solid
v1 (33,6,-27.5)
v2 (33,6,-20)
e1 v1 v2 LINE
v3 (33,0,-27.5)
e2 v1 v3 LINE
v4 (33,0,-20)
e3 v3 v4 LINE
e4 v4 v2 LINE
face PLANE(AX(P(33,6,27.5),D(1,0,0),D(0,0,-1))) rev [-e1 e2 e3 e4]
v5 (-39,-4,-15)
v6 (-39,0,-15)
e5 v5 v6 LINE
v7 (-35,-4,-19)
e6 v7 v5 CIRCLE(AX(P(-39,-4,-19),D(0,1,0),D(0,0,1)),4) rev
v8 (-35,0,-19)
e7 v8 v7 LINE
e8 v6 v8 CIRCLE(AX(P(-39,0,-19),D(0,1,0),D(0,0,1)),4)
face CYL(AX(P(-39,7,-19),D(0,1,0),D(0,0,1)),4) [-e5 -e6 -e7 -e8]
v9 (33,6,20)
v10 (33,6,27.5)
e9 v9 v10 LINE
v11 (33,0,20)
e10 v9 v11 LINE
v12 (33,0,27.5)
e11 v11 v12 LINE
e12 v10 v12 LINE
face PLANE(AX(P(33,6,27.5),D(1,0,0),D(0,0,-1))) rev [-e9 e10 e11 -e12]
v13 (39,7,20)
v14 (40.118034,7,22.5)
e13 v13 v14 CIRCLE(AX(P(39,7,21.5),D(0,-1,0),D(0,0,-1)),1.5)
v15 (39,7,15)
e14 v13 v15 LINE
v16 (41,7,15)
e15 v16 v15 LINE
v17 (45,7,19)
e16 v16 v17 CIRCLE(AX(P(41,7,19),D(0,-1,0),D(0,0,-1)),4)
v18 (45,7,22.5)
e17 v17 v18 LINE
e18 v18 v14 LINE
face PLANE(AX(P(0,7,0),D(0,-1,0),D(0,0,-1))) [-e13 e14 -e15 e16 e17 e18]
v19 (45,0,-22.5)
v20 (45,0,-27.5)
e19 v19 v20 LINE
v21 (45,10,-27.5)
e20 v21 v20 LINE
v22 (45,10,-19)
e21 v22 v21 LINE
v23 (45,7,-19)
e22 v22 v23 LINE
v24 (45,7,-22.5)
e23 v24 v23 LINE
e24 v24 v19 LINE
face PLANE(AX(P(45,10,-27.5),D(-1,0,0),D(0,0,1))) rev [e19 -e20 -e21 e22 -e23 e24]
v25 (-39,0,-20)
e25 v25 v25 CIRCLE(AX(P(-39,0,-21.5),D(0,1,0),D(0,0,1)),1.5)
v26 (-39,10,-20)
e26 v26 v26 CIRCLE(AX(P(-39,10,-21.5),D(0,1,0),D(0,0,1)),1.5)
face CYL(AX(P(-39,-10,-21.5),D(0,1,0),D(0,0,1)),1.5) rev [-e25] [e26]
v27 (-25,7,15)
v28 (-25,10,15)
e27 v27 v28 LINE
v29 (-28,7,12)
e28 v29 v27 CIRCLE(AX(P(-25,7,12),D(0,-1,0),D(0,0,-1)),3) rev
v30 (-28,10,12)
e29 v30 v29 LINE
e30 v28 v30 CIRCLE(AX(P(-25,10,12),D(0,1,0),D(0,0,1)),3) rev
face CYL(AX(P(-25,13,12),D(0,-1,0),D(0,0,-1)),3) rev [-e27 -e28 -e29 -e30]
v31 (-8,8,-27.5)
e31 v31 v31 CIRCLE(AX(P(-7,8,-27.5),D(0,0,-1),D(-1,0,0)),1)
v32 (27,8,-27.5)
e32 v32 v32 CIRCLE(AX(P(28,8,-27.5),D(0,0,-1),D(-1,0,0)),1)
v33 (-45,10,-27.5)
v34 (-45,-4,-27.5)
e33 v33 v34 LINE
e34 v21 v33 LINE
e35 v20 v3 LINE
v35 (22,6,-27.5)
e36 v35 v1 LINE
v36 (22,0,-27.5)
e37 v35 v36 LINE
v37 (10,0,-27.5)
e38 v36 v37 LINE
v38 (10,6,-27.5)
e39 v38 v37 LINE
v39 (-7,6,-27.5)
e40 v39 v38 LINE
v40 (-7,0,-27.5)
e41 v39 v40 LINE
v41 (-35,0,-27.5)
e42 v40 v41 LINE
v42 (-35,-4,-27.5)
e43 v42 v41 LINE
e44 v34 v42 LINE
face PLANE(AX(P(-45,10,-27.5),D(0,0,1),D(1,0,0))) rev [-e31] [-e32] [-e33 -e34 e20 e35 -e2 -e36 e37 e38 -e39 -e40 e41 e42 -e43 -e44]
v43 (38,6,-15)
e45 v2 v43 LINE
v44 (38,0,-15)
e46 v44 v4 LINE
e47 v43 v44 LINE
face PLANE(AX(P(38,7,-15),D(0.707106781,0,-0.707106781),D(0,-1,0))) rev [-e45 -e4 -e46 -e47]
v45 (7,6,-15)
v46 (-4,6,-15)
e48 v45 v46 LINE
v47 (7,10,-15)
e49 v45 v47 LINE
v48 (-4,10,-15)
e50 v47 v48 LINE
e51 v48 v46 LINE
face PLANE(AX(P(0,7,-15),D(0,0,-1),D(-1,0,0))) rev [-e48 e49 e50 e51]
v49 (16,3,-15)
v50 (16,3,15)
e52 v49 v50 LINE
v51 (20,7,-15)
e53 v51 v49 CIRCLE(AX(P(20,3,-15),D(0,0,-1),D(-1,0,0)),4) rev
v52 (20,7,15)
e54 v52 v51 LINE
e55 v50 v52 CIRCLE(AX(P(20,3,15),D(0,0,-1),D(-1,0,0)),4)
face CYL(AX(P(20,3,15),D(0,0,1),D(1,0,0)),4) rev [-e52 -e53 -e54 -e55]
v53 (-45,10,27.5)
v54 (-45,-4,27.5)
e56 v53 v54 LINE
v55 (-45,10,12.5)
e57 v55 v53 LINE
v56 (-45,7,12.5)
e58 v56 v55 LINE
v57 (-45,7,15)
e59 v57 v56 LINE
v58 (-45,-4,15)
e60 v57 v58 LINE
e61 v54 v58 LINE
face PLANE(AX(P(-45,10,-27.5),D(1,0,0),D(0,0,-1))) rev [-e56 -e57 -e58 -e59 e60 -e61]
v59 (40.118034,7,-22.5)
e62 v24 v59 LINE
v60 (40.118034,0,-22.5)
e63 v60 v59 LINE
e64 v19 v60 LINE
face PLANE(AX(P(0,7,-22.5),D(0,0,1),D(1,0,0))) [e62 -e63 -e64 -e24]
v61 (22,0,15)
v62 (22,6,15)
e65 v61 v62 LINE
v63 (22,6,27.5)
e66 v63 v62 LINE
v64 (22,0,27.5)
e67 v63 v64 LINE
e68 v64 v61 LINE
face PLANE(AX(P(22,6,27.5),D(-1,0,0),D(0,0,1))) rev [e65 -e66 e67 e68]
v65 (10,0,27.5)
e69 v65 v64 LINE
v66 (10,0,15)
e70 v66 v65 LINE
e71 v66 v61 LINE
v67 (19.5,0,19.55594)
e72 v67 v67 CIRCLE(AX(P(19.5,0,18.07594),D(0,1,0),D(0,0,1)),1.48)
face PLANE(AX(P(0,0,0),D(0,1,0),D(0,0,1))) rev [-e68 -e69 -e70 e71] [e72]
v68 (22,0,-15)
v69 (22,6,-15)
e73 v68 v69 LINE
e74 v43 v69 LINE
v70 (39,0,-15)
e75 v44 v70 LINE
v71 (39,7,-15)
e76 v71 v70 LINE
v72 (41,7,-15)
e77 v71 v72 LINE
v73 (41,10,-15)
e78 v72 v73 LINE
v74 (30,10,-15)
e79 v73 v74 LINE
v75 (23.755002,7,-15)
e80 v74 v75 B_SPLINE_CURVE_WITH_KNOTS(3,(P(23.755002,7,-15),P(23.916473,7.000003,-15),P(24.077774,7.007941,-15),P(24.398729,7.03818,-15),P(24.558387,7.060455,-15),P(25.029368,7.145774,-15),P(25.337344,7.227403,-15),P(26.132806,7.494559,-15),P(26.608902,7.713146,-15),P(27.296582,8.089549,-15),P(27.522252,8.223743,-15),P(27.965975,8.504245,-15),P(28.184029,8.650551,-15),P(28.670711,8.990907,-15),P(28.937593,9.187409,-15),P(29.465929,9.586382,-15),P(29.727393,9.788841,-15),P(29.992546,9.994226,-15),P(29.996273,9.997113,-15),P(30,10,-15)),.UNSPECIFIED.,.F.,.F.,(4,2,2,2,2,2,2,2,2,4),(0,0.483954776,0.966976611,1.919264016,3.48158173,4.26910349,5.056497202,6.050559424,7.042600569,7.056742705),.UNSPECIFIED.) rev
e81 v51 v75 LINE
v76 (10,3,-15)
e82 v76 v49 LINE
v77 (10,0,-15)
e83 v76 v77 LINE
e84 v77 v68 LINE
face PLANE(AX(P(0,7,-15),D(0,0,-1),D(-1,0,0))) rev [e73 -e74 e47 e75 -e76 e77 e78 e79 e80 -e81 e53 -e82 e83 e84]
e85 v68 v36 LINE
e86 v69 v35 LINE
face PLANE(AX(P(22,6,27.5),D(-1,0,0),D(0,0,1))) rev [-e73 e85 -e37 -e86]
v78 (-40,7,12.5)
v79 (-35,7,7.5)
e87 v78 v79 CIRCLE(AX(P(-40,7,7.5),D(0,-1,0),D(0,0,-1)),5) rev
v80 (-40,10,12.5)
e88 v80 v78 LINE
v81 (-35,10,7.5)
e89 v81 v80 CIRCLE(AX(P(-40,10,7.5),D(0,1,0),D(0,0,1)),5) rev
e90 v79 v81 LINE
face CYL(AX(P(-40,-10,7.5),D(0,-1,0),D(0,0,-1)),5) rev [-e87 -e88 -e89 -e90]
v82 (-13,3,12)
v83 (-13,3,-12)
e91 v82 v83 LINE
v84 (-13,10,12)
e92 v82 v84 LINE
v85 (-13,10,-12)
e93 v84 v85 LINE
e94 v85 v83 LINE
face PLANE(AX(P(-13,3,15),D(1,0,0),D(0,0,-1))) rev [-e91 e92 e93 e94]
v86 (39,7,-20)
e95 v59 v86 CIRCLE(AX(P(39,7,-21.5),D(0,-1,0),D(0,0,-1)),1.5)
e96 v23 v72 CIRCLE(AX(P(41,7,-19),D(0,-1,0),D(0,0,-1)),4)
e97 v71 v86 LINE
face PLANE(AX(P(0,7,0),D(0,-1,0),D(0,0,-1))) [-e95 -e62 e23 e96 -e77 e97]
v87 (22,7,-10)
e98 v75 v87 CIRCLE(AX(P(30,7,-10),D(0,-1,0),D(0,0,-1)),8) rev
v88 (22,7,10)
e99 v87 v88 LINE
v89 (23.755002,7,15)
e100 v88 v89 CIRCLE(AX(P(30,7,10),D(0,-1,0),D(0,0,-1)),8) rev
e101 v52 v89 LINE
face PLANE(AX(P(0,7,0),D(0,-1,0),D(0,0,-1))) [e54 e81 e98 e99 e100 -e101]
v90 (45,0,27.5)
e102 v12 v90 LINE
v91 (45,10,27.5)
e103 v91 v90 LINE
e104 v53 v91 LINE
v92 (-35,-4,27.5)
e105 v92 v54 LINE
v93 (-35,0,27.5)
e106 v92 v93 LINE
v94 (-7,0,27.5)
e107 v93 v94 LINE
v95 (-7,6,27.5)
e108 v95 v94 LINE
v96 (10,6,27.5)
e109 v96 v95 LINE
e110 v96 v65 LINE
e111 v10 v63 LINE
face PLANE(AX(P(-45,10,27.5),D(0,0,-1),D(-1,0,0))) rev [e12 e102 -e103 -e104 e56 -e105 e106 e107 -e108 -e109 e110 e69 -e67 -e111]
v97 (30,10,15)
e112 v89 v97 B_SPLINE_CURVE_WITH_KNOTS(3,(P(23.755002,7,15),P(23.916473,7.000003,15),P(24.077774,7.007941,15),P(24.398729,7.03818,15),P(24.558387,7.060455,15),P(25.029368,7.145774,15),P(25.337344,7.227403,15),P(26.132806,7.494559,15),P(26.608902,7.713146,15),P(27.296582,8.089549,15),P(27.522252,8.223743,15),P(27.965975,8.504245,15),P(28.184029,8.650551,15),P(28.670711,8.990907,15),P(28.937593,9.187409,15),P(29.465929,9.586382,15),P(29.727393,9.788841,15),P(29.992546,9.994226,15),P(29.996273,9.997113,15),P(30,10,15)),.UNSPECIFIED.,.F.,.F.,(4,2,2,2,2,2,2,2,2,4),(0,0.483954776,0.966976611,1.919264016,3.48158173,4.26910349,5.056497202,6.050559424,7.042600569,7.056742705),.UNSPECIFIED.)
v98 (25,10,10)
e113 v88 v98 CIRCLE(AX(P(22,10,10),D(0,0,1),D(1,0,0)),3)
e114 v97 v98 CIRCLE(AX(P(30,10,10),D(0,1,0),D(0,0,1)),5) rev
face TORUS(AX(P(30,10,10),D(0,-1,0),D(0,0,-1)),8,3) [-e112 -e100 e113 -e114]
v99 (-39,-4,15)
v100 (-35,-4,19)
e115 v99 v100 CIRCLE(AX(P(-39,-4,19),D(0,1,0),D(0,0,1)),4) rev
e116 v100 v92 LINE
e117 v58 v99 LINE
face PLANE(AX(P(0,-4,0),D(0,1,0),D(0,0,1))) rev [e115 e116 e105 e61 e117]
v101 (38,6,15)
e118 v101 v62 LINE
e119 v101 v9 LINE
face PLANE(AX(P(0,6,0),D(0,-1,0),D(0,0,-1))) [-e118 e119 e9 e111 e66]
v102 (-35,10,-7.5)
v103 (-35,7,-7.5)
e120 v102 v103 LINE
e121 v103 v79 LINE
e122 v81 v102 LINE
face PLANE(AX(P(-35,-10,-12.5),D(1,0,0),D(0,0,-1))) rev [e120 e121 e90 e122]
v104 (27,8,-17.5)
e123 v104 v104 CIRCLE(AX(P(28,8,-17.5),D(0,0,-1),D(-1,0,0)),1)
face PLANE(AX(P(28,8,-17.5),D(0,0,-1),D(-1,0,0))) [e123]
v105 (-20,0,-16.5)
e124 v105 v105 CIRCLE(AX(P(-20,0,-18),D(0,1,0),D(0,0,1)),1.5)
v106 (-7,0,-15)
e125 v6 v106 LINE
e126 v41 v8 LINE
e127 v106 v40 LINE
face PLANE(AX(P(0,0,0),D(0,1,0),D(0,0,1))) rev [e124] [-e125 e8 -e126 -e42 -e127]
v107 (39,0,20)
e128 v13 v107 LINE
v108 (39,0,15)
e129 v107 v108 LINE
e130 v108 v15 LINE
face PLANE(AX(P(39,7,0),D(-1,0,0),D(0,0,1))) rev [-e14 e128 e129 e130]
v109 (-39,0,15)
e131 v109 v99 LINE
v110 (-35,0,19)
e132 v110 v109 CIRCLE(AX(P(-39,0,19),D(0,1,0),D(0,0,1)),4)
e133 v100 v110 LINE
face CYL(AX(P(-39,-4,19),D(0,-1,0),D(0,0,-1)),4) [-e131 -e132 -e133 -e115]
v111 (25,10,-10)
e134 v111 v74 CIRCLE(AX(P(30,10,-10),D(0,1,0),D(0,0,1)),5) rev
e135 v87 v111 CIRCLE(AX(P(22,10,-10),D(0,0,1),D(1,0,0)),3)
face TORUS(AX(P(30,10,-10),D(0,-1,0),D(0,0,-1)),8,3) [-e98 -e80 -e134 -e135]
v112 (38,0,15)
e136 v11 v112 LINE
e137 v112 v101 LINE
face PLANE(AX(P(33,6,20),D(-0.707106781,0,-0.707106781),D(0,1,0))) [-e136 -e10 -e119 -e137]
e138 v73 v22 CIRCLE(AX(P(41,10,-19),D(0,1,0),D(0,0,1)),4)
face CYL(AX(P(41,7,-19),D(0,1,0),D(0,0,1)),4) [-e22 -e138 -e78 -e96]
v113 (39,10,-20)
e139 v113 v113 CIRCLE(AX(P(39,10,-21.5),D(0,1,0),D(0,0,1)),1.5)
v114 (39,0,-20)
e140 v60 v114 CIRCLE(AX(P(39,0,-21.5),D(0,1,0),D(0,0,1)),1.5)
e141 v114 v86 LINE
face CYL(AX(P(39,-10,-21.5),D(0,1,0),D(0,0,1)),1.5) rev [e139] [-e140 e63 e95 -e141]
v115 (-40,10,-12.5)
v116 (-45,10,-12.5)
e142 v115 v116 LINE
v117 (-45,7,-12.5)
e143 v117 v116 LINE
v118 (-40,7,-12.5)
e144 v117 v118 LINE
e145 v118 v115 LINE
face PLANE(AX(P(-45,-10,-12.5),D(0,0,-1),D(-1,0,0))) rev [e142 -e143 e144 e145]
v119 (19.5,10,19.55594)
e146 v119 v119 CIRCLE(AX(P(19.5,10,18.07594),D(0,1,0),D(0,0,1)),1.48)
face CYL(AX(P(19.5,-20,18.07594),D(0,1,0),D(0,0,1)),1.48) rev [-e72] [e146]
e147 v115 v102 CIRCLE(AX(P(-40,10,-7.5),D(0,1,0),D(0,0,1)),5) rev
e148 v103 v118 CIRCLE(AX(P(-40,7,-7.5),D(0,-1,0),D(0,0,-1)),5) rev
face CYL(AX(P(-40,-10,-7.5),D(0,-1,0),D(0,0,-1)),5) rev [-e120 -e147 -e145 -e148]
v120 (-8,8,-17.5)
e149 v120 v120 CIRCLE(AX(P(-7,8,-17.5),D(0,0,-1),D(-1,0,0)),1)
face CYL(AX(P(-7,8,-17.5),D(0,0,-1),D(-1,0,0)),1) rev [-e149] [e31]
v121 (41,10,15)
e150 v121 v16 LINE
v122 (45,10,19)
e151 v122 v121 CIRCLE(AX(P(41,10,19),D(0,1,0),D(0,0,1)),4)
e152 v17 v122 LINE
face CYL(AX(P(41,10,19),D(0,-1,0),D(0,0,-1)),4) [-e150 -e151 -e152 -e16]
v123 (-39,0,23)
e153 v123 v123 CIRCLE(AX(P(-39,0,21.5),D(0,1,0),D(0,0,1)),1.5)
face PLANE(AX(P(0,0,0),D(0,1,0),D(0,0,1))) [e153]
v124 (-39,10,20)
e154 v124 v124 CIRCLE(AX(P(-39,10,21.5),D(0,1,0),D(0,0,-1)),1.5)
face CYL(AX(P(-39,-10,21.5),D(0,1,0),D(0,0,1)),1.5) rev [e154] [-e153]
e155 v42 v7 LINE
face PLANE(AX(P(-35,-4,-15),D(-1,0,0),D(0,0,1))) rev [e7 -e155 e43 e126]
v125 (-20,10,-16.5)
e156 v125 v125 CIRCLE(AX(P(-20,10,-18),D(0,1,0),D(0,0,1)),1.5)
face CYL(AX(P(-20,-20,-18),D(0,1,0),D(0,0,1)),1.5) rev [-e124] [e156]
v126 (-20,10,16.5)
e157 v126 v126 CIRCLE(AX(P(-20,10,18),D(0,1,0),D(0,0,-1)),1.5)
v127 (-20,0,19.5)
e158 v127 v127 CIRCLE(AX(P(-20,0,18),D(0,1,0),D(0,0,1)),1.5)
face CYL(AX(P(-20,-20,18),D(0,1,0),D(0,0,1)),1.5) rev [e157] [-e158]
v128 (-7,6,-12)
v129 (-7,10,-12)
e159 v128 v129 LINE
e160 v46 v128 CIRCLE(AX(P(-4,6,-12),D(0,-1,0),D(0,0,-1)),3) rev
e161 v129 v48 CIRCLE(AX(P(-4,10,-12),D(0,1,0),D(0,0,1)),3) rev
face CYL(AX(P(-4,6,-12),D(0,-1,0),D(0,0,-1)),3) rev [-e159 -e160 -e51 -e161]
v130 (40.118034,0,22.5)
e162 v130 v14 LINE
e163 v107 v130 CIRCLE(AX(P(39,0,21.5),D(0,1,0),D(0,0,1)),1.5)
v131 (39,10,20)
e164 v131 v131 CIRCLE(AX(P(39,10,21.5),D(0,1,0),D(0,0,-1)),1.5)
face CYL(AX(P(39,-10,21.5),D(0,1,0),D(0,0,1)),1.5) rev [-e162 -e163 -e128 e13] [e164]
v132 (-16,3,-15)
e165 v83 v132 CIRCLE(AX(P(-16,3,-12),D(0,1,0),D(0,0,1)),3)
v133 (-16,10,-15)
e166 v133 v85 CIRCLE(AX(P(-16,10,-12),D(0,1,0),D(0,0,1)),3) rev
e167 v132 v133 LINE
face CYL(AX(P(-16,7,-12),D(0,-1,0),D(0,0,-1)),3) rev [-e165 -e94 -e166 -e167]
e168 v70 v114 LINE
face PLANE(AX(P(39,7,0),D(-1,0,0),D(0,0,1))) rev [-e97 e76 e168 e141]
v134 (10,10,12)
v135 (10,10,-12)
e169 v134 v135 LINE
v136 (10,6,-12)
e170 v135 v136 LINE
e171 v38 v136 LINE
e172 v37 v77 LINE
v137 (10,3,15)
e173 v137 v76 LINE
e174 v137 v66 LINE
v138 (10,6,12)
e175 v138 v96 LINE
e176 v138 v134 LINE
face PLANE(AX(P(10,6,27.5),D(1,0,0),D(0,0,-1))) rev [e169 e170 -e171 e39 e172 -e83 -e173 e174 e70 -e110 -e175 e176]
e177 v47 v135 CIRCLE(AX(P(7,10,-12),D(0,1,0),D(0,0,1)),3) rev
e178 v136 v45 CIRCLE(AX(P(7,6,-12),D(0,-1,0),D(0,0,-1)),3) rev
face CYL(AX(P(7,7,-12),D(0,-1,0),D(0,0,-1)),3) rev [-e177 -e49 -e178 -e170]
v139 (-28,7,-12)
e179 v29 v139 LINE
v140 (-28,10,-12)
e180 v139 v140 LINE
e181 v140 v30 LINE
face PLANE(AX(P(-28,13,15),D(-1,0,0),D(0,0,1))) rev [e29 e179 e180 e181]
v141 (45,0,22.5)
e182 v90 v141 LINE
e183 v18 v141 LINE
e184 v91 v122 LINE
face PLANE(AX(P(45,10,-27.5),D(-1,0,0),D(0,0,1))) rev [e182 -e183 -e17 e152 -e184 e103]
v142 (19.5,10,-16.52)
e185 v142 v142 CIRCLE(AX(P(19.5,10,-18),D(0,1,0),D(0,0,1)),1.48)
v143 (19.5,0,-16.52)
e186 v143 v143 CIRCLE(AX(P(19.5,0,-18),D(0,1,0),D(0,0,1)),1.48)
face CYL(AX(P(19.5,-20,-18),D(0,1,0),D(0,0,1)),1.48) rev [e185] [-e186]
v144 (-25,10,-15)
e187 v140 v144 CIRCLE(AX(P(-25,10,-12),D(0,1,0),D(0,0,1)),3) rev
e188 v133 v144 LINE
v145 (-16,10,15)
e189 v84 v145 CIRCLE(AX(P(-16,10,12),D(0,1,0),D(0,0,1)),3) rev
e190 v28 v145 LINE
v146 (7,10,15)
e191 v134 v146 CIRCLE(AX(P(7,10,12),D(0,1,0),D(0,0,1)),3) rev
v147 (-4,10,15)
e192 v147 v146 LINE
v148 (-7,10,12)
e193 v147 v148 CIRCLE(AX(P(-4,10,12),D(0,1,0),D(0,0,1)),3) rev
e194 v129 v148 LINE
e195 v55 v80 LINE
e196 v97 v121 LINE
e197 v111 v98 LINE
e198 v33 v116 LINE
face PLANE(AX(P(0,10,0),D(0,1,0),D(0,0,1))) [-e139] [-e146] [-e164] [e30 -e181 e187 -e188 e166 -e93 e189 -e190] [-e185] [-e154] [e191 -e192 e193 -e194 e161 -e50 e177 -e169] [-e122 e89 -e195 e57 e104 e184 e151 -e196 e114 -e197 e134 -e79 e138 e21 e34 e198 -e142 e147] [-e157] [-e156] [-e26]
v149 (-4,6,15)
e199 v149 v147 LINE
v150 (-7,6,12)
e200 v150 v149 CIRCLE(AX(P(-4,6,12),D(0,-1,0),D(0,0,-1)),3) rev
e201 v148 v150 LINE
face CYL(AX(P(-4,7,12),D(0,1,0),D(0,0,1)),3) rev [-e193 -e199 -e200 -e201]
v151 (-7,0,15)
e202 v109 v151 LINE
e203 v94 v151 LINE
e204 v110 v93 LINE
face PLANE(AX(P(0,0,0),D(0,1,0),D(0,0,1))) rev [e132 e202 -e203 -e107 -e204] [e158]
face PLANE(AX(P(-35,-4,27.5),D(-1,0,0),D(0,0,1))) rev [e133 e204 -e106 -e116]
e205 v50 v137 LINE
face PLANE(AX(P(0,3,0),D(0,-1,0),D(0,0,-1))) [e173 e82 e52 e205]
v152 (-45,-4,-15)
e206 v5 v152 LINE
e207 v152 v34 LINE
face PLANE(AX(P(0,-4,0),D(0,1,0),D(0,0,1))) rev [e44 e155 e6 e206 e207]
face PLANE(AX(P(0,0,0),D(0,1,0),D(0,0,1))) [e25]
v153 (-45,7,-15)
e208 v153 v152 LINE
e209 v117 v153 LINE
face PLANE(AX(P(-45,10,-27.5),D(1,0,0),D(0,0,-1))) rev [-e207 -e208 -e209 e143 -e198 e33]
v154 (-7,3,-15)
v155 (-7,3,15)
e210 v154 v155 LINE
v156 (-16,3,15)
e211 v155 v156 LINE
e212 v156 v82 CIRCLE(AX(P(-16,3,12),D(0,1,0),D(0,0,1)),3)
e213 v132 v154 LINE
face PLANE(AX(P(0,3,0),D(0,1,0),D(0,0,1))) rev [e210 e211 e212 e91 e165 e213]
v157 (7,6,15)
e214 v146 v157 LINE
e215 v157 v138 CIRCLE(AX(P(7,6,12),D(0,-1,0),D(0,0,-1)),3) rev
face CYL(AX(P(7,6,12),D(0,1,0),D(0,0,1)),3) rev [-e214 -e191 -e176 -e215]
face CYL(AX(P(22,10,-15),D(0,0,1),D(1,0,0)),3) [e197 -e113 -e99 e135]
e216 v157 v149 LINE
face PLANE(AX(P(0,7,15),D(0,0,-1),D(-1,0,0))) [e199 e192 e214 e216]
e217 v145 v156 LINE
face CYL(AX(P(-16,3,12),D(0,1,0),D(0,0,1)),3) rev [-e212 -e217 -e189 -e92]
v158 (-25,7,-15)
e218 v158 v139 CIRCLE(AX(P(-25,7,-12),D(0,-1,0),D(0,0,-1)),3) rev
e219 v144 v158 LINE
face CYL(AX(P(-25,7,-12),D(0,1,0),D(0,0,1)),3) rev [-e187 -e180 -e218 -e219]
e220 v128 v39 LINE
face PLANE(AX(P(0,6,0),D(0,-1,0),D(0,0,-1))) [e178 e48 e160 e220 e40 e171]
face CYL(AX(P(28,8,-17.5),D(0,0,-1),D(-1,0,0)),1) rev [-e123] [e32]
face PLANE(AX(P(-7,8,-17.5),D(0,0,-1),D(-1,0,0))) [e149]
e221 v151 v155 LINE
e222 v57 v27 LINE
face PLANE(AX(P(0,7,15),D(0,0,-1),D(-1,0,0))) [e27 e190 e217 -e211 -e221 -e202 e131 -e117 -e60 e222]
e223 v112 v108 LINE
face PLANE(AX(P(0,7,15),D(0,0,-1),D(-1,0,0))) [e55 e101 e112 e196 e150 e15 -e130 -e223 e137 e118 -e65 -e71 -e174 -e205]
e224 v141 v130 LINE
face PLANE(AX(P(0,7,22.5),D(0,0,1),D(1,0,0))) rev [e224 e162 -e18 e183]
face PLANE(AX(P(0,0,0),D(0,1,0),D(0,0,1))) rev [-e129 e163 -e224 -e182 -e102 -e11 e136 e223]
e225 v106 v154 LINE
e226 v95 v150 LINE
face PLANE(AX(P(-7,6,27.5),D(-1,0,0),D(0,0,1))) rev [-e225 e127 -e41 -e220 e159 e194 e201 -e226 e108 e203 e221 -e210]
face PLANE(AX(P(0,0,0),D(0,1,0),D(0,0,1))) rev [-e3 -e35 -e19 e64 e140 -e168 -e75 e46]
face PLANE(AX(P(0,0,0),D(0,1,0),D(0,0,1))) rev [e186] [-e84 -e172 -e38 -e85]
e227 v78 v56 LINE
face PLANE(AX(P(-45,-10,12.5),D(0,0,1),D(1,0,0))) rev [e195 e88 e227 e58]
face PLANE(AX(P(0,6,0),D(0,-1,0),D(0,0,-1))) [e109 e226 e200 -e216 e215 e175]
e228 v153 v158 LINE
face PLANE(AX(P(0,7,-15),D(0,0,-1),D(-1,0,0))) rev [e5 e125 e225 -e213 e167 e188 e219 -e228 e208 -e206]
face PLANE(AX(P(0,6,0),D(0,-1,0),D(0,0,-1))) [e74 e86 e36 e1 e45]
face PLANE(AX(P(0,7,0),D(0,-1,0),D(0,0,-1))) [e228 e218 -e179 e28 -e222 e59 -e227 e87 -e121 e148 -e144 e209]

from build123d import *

# Parameters (mm, degrees)
SKETCH_1_W           = 90
SKETCH_1_H           = 55
EXTRUDE_1_DEPTH      = 10
SKETCH_2_R           = 1.5
SKETCH_2_R_2         = 1.48
CUT_EXTRUDE_1_DEPTH  = 30
SKETCH_3_W           = 80
SKETCH_3_H           = 30
SKETCH_3_W_2         = 6
SKETCH_3_H_2         = 45
CUT_EXTRUDE_2_DEPTH  = 7
SKETCH_4_R           = 1.5
CUT_EXTRUDE_3_DEPTH  = 20
SKETCH_8_W           = 10
SKETCH_8_H           = 25
SKETCH_8_W_2         = 20
SKETCH_8_H_2         = 30
CUT_EXTRUDE_6_DEPTH  = 20
SKETCH_10_W          = 11
SKETCH_10_H          = 55
SKETCH_10_W_2        = 17
CUT_EXTRUDE_8_DEPTH  = 6
FILLET_3_R           = 5
SKETCH_11_W          = 6
SKETCH_11_H          = 30
EXTRUDE_3_DEPTH      = 4
CHAMFER_3_SIZE       = 5
FILLET_7_R           = 3
SKETCH_12_W          = 15
SKETCH_12_H          = 30
SKETCH_12_W_2        = 17
CUT_EXTRUDE_9_DEPTH  = 6
FILLET_8_R           = 3
FILLET_9_R           = 4
SKETCH_13_W          = 10
SKETCH_13_H          = 12.5
EXTRUDE_4_DEPTH      = 4
FILLET_10_R          = 4
FILLET_11_R          = 4
SKETCH_14_R          = 1
CUT_EXTRUDE_10_DEPTH = 10


# Some blends are built 0.0001 mm under size
with BuildPart() as part:
    # 草图1 → 凸台-拉伸1 (new body)
    with BuildSketch(Plane(origin=(0, 0, 0), x_dir=(1, 0, 0), z_dir=(0, 1, 0))):
        Rectangle(SKETCH_1_W, SKETCH_1_H)
    extrude(amount=EXTRUDE_1_DEPTH)

    # 草图2 → 切除-拉伸1 (cut)
    with BuildSketch(Plane(origin=(0, 10, 0), x_dir=(1, 0, 0), z_dir=(0, 1, 0))):
        with Locations(Location((-20, 18, 0), (0, 0, 270))):
            Circle(SKETCH_2_R)
        with Locations(Location((-20, -18, 0), (0, 0, 270))):
            Circle(SKETCH_2_R)
        with Locations(Location((19.5, -18.075939793, 0), (0, 0, 270))):
            Circle(SKETCH_2_R_2)
        with Locations(Location((19.5, 18, 0), (0, 0, 270))):
            Circle(SKETCH_2_R_2)
    extrude(amount=-CUT_EXTRUDE_1_DEPTH, mode=Mode.SUBTRACT)

    # 草图3 → 切除-拉伸2 (cut)
    with BuildSketch(Plane.XZ):
        with Locations((-5, 0)):
            Rectangle(SKETCH_3_W, SKETCH_3_H)
        with Locations((42, 0)):
            Rectangle(SKETCH_3_W_2, SKETCH_3_H_2)
    extrude(amount=-CUT_EXTRUDE_2_DEPTH, mode=Mode.SUBTRACT)

    # 草图4 → 切除-拉伸3 (cut)
    with BuildSketch(Plane(origin=(0, 10, 0), x_dir=(1, 0, 0), z_dir=(0, 1, 0))):
        with Locations(Location((39, 21.5, 0), (0, 0, 270))):
            Circle(SKETCH_4_R)
        with Locations(Location((-39, 21.5, 0), (0, 0, 270))):
            Circle(SKETCH_4_R)
        with Locations(Location((-39, -21.5, 0), (0, 0, 270))):
            Circle(SKETCH_4_R)
        with Locations(Location((39, -21.5, 0), (0, 0, 90))):
            Circle(SKETCH_4_R)
    extrude(amount=-CUT_EXTRUDE_3_DEPTH, mode=Mode.SUBTRACT)

    # 草图8 → 切除-拉伸6 (cut)
    with BuildSketch(Plane(origin=(0, 10, 0), x_dir=(1, 0, 0), z_dir=(0, 1, 0))):
        with Locations((-40, 0)):
            Rectangle(SKETCH_8_W, SKETCH_8_H)
        with Locations((35, 0)):
            Rectangle(SKETCH_8_W_2, SKETCH_8_H_2)
    extrude(amount=-CUT_EXTRUDE_6_DEPTH, mode=Mode.SUBTRACT)

    # 草图10 → 切除-拉伸8 (cut)
    with BuildSketch(Plane.XZ):
        with Locations((27.5, 0)):
            Rectangle(SKETCH_10_W, SKETCH_10_H)
        with Locations((1.5, 0)):
            Rectangle(SKETCH_10_W_2, SKETCH_10_H)
    extrude(amount=-CUT_EXTRUDE_8_DEPTH, mode=Mode.SUBTRACT)

    # 圆角3
    fillet_3_edges = [part.edges().sort_by_distance(p)[0] for p in [
        (-35, 8.5, -12.5),
        (-35, 8.5, 12.5),
        (25, 8.5, 15),
        (25, 8.5, -15),
    ]]
    fillet(fillet_3_edges, radius=FILLET_3_R)

    # 草图11 → 凸台-拉伸3 (add)
    with BuildSketch(Plane.XZ.offset(-7)):
        with Locations((-10, 0)):
            Rectangle(SKETCH_11_W, SKETCH_11_H)
        with Locations((13, 0)):
            Rectangle(SKETCH_11_W, SKETCH_11_H)
    extrude(amount=EXTRUDE_3_DEPTH)

    # 倒角3
    chamfer_3_edges = [part.edges().sort_by_distance(p)[0] for p in [
        (33, 3, 15),
        (33, 3, -15),
    ]]
    chamfer(chamfer_3_edges, length=CHAMFER_3_SIZE)

    # 圆角7
    # the kernel refuses this fillet: 3 mm, written as the material it takes off along each edge
    with BuildSketch(Plane(origin=(25, 7, 10), x_dir=(0, 1, 0), z_dir=(0, 0, -1))) as fillet_7_piece_1:
        with BuildLine():
            CenterArc((FILLET_7_R, -FILLET_7_R), FILLET_7_R, 90, 90)
            Line((0, -FILLET_7_R), (0, 0))
            Line((0, 0), (FILLET_7_R, 0))
        make_face()
    extrude(amount=20, mode=Mode.SUBTRACT)
    with BuildSketch(Plane(origin=(30, 7, 10), x_dir=(0.9975374290817743, 0, 0.0701361360564157), z_dir=(0.0701361360564157, 0, -0.9975374290817743))) as fillet_7_piece_2_section:
        with BuildLine():
            CenterArc((5 + FILLET_7_R, -FILLET_7_R), FILLET_7_R, 90, 90)
            Line((5 + FILLET_7_R, 0), (5, 0))
            Line((5, 0), (5, -FILLET_7_R))
        make_face()
    fillet_7_piece_2 = revolve(axis=Axis((30, 7, 10), (0, -1, 0)), revolution_arc=175.978193542, mode=Mode.PRIVATE)
    fillet_7_piece_2 = split(fillet_7_piece_2, bisect_by=Plane(origin=(26.314129742, 7.843114036, 15), z_dir=(0, 0, -1)), keep=Keep.TOP, mode=Mode.PRIVATE)
    add(fillet_7_piece_2, mode=Mode.SUBTRACT)
    with BuildSketch(Plane(origin=(30, 7, -10), x_dir=(0.9975374290817743, 0, -0.0701361360564157), z_dir=(0.0701361360564157, 0, 0.9975374290817743))) as fillet_7_piece_3_section:
        with BuildLine():
            CenterArc((5 + FILLET_7_R, FILLET_7_R), FILLET_7_R, 180, 90)
            Line((5 + FILLET_7_R, 0), (5, 0))
            Line((5, 0), (5, FILLET_7_R))
        make_face()
    fillet_7_piece_3 = revolve(axis=Axis((30, 7, -10), (0, 1, 0)), revolution_arc=175.978193542, mode=Mode.PRIVATE)
    fillet_7_piece_3 = split(fillet_7_piece_3, bisect_by=Plane(origin=(26.31413004, 7.843114018, -15), z_dir=(0, 0, 1)), keep=Keep.TOP, mode=Mode.PRIVATE)
    add(fillet_7_piece_3, mode=Mode.SUBTRACT)

    # 草图12 → 切除-拉伸9 (cut)
    with BuildSketch(Plane.XZ.offset(-7)):
        with Locations((-20.5, 0)):
            Rectangle(SKETCH_12_W, SKETCH_12_H)
        with Locations((1.5, 0)):
            Rectangle(SKETCH_12_W_2, SKETCH_12_H)
    extrude(amount=-CUT_EXTRUDE_9_DEPTH, mode=Mode.SUBTRACT)

    # 圆角8
    fillet_8_edges = [part.edges().sort_by_distance(p)[0] for p in [
        (-7, 8, -15),
        (-7, 8, 15),
        (-13, 6.5, 15),
        (-13, 6.5, -15),
        (10, 8, 15),
        (10, 8, -15),
        (-28, 8.5, -15),
        (-28, 8.5, 15),
    ]]
    fillet(fillet_8_edges, radius=FILLET_8_R)

    # 圆角9
    fillet_9_edges = [part.edges().sort_by_distance(p)[0] for p in [
        (16, 7, 0),
    ]]
    fillet(fillet_9_edges, radius=FILLET_9_R - 0.0001)  # a hair under: the kernel refuses the full size

    # 草图13 → 凸台-拉伸4 (add)
    with BuildSketch(Plane.XZ):
        with Locations((-40, 21.25)):
            Rectangle(SKETCH_13_W, SKETCH_13_H)
        with Locations((-40, -21.25)):
            Rectangle(SKETCH_13_W, SKETCH_13_H)
    extrude(amount=EXTRUDE_4_DEPTH)

    # 圆角10
    fillet_10_edges = [part.edges().sort_by_distance(p)[0] for p in [
        (-35, -2, 15),
        (-35, -2, -15),
    ]]
    fillet(fillet_10_edges, radius=FILLET_10_R)

    # 圆角11
    fillet_11_edges = [part.edges().sort_by_distance(p)[0] for p in [
        (45, 8.5, 15),
        (45, 8.5, -15),
    ]]
    fillet(fillet_11_edges, radius=FILLET_11_R)

    # 草图14 → 切除-拉伸10 (cut)
    with BuildSketch(Plane(origin=(0, 0, -27.5), x_dir=(-1, 0, 0), z_dir=(0, 0, -1))):
        with Locations((-28, 8)):
            Circle(SKETCH_14_R)
        with Locations((7, 8)):
            Circle(SKETCH_14_R)
    extrude(amount=-CUT_EXTRUDE_10_DEPTH, mode=Mode.SUBTRACT)


solid = part.part
